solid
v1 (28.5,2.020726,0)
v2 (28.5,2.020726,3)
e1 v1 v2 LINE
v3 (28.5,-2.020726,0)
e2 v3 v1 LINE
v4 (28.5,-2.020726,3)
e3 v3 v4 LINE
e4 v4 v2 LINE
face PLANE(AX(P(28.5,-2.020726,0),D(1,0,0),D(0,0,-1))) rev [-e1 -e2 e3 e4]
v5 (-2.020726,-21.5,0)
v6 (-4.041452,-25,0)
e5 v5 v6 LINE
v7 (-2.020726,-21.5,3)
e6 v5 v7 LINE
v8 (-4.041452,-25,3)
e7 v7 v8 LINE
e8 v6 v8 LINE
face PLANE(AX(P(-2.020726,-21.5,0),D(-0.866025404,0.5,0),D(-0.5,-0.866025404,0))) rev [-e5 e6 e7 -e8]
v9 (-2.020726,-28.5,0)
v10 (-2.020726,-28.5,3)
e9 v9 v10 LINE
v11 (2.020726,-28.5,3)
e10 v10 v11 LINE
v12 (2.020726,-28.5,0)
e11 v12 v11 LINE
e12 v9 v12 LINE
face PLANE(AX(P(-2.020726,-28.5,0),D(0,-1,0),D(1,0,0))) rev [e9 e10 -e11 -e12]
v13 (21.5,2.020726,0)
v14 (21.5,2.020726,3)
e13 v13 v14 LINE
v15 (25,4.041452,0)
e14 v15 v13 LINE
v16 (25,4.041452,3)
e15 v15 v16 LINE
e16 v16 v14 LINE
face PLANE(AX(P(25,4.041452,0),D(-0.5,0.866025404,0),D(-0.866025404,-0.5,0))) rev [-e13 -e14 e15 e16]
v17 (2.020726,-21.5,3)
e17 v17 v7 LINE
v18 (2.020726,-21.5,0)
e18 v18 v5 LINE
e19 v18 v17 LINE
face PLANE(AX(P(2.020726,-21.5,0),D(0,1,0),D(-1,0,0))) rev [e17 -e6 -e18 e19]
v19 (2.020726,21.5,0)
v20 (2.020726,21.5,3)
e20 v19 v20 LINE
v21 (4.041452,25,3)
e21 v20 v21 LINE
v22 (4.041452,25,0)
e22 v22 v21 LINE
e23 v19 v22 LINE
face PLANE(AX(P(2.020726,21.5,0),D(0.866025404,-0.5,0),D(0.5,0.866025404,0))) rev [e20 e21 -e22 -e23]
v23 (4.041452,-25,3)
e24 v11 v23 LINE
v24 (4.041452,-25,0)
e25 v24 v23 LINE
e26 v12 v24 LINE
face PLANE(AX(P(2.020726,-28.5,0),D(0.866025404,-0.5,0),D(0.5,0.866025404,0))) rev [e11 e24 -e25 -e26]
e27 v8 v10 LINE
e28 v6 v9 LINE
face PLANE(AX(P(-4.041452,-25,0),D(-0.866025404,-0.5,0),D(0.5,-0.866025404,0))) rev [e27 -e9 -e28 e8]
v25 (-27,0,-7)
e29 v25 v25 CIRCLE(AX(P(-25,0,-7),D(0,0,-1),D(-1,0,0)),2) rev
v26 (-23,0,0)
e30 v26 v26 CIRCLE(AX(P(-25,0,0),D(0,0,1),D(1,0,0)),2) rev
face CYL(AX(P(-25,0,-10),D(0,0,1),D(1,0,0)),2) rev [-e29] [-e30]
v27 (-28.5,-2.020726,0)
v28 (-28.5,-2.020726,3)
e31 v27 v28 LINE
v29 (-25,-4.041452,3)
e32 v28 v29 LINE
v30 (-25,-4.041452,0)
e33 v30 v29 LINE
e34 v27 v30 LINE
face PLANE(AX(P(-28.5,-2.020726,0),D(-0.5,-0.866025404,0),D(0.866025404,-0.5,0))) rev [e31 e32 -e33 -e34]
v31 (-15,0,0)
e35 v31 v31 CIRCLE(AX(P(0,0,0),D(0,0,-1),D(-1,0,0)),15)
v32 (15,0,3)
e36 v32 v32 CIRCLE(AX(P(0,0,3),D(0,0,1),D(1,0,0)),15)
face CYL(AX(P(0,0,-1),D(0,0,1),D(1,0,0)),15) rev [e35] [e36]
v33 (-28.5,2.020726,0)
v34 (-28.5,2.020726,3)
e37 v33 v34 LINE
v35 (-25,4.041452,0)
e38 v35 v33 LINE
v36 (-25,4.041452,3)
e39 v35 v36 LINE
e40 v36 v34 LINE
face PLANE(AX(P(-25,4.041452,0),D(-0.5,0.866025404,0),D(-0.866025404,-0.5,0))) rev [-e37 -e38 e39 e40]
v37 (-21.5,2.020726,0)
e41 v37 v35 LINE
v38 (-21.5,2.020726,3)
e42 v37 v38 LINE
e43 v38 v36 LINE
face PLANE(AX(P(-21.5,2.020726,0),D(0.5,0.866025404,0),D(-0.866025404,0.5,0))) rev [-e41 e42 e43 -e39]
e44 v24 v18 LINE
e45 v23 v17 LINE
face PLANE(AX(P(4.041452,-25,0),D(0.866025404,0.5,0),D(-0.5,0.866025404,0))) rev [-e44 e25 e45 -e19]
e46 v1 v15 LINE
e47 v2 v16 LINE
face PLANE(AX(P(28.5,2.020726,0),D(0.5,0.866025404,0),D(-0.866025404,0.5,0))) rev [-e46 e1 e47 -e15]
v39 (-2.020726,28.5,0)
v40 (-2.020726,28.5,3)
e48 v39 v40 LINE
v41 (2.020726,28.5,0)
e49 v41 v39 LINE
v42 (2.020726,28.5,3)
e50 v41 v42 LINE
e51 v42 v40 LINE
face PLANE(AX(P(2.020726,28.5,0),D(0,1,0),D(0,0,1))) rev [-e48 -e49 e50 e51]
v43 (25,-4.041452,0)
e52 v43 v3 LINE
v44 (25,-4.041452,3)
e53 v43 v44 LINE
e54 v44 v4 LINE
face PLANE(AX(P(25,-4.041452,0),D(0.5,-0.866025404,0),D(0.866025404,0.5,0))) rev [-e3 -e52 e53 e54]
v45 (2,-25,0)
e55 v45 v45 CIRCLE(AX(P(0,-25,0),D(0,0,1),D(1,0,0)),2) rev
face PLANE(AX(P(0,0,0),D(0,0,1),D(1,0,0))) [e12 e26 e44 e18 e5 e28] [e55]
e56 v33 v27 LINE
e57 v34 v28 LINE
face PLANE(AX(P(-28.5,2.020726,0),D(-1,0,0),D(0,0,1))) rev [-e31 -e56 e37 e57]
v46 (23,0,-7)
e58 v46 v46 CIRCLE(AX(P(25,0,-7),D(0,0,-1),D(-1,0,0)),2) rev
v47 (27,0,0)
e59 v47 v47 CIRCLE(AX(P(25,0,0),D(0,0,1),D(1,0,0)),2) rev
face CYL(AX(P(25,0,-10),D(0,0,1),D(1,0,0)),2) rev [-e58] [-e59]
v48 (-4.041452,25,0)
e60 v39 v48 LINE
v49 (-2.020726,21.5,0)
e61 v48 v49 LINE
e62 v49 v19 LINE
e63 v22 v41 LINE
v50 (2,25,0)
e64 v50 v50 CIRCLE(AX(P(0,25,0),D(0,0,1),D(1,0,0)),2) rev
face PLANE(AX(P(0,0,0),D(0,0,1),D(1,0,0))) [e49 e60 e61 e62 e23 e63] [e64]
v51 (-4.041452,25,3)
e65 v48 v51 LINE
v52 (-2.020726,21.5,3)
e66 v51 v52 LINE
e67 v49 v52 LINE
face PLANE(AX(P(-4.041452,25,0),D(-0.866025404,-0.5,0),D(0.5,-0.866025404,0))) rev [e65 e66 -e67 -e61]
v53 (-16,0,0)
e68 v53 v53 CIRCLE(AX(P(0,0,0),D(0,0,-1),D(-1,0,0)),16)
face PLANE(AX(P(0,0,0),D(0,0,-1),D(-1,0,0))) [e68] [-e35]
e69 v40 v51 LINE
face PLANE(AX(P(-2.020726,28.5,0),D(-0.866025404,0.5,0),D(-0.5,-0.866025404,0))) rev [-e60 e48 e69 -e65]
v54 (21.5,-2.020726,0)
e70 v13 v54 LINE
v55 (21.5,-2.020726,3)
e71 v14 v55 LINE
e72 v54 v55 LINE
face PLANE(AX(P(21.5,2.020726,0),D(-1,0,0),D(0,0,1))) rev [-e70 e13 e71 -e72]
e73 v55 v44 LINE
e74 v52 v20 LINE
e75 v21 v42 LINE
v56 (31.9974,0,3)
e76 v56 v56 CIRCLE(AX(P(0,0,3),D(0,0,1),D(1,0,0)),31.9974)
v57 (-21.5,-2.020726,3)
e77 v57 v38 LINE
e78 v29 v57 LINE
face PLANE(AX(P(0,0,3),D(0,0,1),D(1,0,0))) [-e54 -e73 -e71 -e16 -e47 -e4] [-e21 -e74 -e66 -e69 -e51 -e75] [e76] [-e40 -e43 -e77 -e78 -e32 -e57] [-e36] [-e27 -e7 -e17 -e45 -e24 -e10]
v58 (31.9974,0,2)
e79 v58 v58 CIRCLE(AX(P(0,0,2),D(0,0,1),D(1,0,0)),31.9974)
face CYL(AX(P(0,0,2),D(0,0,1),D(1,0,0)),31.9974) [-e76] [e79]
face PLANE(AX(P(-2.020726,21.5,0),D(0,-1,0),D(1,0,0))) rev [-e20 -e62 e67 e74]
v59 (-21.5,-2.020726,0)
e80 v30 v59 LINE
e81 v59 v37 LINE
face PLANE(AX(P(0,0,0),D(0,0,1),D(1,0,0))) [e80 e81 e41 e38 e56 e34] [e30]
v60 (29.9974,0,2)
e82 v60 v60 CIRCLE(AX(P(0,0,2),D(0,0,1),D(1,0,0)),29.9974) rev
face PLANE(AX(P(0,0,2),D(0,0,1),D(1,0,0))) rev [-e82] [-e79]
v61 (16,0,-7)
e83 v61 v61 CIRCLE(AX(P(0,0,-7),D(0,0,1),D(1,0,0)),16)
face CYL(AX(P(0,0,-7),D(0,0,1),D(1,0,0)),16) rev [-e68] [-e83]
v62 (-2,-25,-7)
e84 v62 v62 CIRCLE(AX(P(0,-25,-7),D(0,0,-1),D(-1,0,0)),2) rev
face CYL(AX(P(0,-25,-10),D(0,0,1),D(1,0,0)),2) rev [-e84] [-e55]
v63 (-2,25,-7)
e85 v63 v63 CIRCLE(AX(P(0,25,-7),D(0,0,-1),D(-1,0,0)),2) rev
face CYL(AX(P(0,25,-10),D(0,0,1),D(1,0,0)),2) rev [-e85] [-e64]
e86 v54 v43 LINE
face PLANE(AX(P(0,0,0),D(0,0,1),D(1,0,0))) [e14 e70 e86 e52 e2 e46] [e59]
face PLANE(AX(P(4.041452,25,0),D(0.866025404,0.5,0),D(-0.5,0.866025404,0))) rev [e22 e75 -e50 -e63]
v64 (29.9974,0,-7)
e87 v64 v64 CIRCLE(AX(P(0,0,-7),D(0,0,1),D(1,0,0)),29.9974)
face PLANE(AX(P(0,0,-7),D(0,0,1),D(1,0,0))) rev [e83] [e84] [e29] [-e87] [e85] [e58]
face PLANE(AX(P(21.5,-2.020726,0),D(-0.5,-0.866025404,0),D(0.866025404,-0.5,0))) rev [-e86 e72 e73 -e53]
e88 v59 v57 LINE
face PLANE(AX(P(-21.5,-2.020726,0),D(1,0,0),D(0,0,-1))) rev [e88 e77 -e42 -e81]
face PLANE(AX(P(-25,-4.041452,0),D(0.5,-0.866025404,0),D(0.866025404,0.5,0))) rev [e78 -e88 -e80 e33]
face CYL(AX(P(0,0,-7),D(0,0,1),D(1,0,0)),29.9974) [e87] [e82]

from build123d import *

# Parameters (mm, degrees)
SKETCH1_R           = 29.9974
SKETCH1_R_2         = 16
BOSS_EXTRUDE1_DEPTH = 7
SKETCH2_R           = 2
CUT_EXTRUDE1_DEPTH  = 10
SKETCH3_R           = 16
SKETCH3_R_2         = 15
BOSS_EXTRUDE2_DEPTH = 1
BOSS_EXTRUDE3_START = 3
SKETCH1_3_R         = 29.9974
SKETCH1_3_R_2       = 16
BOSS_EXTRUDE3_DEPTH = 3
BOSS_EXTRUDE4_START = 2
SKETCH3_2_R         = 16
SKETCH3_2_R_2       = 15
BOSS_EXTRUDE4_DEPTH = 2
SKETCH4_R           = 31.9974
SKETCH4_R_2         = 29.9974
BOSS_EXTRUDE5_DEPTH = 1
CUT_EXTRUDE3_START  = -1
SKETCH5_R           = 16
SKETCH5_R_2         = 15
CUT_EXTRUDE3_DEPTH  = 1
SKETCH6_R           = 3
SKETCH6_R_2         = 2
BOSS_EXTRUDE6_DEPTH = 3
CHAMFER1_SIZE       = 3
CUT_EXTRUDE4_START  = -10
SKETCH7_R           = 2
CUT_EXTRUDE4_DEPTH  = 10
BOSS_EXTRUDE7_START = 1
SKETCH8_R           = 16
SKETCH8_R_2         = 15
BOSS_EXTRUDE7_DEPTH = 1
CUT_EXTRUDE6_DEPTH  = 3


# Read off the part's stored shape, not the designer's step: Cut-Extrude5
with BuildPart() as part:
    # Sketch1 → Boss-Extrude1 (new body)
    with BuildSketch(Plane.XY):
        Circle(SKETCH1_R)
        Circle(SKETCH1_R_2, mode=Mode.SUBTRACT)
    extrude(amount=-BOSS_EXTRUDE1_DEPTH)

    # Sketch2 → Cut-Extrude1 (cut)
    with BuildSketch(Plane.XY):
        with Locations((25, 0)):
            Circle(SKETCH2_R)
        with Locations((0, -25)):
            Circle(SKETCH2_R)
        with Locations((-25, 0)):
            Circle(SKETCH2_R)
        with Locations((0, 25)):
            Circle(SKETCH2_R)
    extrude(amount=-CUT_EXTRUDE1_DEPTH, mode=Mode.SUBTRACT)

    # Sketch3 → Boss-Extrude2 (add)
    with BuildSketch(Plane.XY):
        Circle(SKETCH3_R)
        Circle(SKETCH3_R_2, mode=Mode.SUBTRACT)
    extrude(amount=-BOSS_EXTRUDE2_DEPTH)

    # Sketch1<3> → Boss-Extrude3 (add)
    with BuildSketch(Plane.XY.offset(BOSS_EXTRUDE3_START)):
        Circle(SKETCH1_3_R)
        Circle(SKETCH1_3_R_2, mode=Mode.SUBTRACT)
    extrude(amount=-BOSS_EXTRUDE3_DEPTH)

    # Sketch3<2> → Boss-Extrude4 (add)
    with BuildSketch(Plane.XY.offset(BOSS_EXTRUDE4_START)):
        Circle(SKETCH3_2_R)
        Circle(SKETCH3_2_R_2, mode=Mode.SUBTRACT)
    extrude(amount=-BOSS_EXTRUDE4_DEPTH)

    # Sketch4 → Boss-Extrude5 (add)
    with BuildSketch(Plane.XY.offset(3)):
        Circle(SKETCH4_R)
        Circle(SKETCH4_R_2, mode=Mode.SUBTRACT)
    extrude(amount=-BOSS_EXTRUDE5_DEPTH)

    # Sketch5 → Cut-Extrude3 (cut)
    with BuildSketch(Plane(origin=(0, 0, -1), x_dir=(-1, 0, 0), z_dir=(0, 0, -1)).offset(CUT_EXTRUDE3_START)):
        with Locations(Location((0, 0, 0), (0, 0, 180))):
            Circle(SKETCH5_R)
        with Locations(Location((0, 0, 0), (0, 0, 180))):
            Circle(SKETCH5_R_2, mode=Mode.SUBTRACT)
    extrude(amount=CUT_EXTRUDE3_DEPTH, mode=Mode.SUBTRACT)

    # Sketch6 → Boss-Extrude6 (add)
    # profile 1 of 4: a face of its own
    with BuildSketch(Plane(origin=(0, 0, -7), x_dir=(-1, 0, 0), z_dir=(0, 0, -1))):
        with Locations(Location((-25, 0, 0), (0, 0, 180))):
            Circle(SKETCH6_R)
        with Locations(Location((-25, 0, 0), (0, 0, 180))):
            Circle(SKETCH6_R_2, mode=Mode.SUBTRACT)
    # profile 2 of 4: a face of its own
    with BuildSketch(Plane(origin=(0, 0, -7), x_dir=(-1, 0, 0), z_dir=(0, 0, -1))):
        with Locations(Location((0, -25, 0), (0, 0, 180))):
            Circle(SKETCH6_R)
        with Locations(Location((0, -25, 0), (0, 0, 180))):
            Circle(SKETCH6_R_2, mode=Mode.SUBTRACT)
    # profile 3 of 4: a face of its own
    with BuildSketch(Plane(origin=(0, 0, -7), x_dir=(-1, 0, 0), z_dir=(0, 0, -1))):
        with Locations(Location((25, 0, 0), (0, 0, 180))):
            Circle(SKETCH6_R)
        with Locations(Location((25, 0, 0), (0, 0, 180))):
            Circle(SKETCH6_R_2, mode=Mode.SUBTRACT)
    # profile 4 of 4: a face of its own
    with BuildSketch(Plane(origin=(0, 0, -7), x_dir=(-1, 0, 0), z_dir=(0, 0, -1))):
        with Locations(Location((0, 25, 0), (0, 0, 180))):
            Circle(SKETCH6_R)
        with Locations(Location((0, 25, 0), (0, 0, 180))):
            Circle(SKETCH6_R_2, mode=Mode.SUBTRACT)
    extrude(amount=BOSS_EXTRUDE6_DEPTH)

    # Chamfer1
    # the kernel refuses this chamfer: 3 mm, written as the material it adds along each edge
    with BuildSketch(Plane(origin=(25, 0, -7), x_dir=(1, 0, 0), z_dir=(0, 1, 0))) as chamfer1_piece_1_section:
        Polygon((3 + CHAMFER1_SIZE, 0), (3, CHAMFER1_SIZE), (3, 0), align=None)
    chamfer1_piece_1 = revolve(axis=Axis((25, 0, -7), (0, 0, -1)), mode=Mode.PRIVATE)
    chamfer1_piece_1 = chamfer1_piece_1 & Plane(origin=(0, 0, -8.42256149), x_dir=(1, 0, 0), z_dir=(0, 0, 1)) * Cylinder(29.9974, 25, mode=Mode.PRIVATE)
    chamfer1_piece_1 = split(chamfer1_piece_1, bisect_by=Plane(origin=(20.492585696, 0, -10), z_dir=(0, 0, 1)), keep=Keep.TOP, mode=Mode.PRIVATE)
    add(chamfer1_piece_1)
    with BuildSketch(Plane(origin=(0, -25, -7), x_dir=(1, 0, 0), z_dir=(0, 1, 0))) as chamfer1_piece_2_section:
        Polygon((3 + CHAMFER1_SIZE, 0), (3, CHAMFER1_SIZE), (3, 0), align=None)
    chamfer1_piece_2 = revolve(axis=Axis((0, -25, -7), (0, 0, -1)), mode=Mode.PRIVATE)
    chamfer1_piece_2 = chamfer1_piece_2 & Plane(origin=(0, 0, -8.422561428), x_dir=(1, 0, 0), z_dir=(0, 0, 1)) * Cylinder(29.9974, 25, mode=Mode.PRIVATE)
    chamfer1_piece_2 = split(chamfer1_piece_2, bisect_by=Plane(origin=(-4.507414242, -25, -10), z_dir=(0, 0, 1)), keep=Keep.TOP, mode=Mode.PRIVATE)
    add(chamfer1_piece_2)
    with BuildSketch(Plane(origin=(-25, 0, -7), x_dir=(1, 0, 0), z_dir=(0, 1, 0))) as chamfer1_piece_3_section:
        Polygon((3 + CHAMFER1_SIZE, 0), (3, CHAMFER1_SIZE), (3, 0), align=None)
    chamfer1_piece_3 = revolve(axis=Axis((-25, 0, -7), (0, 0, -1)), mode=Mode.PRIVATE)
    chamfer1_piece_3 = chamfer1_piece_3 & Plane(origin=(0, 0, -8.422561427), x_dir=(1, 0, 0), z_dir=(0, 0, 1)) * Cylinder(29.9974, 25, mode=Mode.PRIVATE)
    chamfer1_piece_3 = split(chamfer1_piece_3, bisect_by=Plane(origin=(-29.507414241, 0, -10), z_dir=(0, 0, 1)), keep=Keep.TOP, mode=Mode.PRIVATE)
    add(chamfer1_piece_3)
    with BuildSketch(Plane(origin=(0, 25, -7), x_dir=(1, 0, 0), z_dir=(0, 1, 0))) as chamfer1_piece_4_section:
        Polygon((3 + CHAMFER1_SIZE, 0), (3, CHAMFER1_SIZE), (3, 0), align=None)
    chamfer1_piece_4 = revolve(axis=Axis((0, 25, -7), (0, 0, -1)), mode=Mode.PRIVATE)
    chamfer1_piece_4 = chamfer1_piece_4 & Plane(origin=(0, 0, -8.422561436), x_dir=(1, 0, 0), z_dir=(0, 0, 1)) * Cylinder(29.9974, 25, mode=Mode.PRIVATE)
    chamfer1_piece_4 = split(chamfer1_piece_4, bisect_by=Plane(origin=(-4.50741425, 25, -10), z_dir=(0, 0, 1)), keep=Keep.TOP, mode=Mode.PRIVATE)
    add(chamfer1_piece_4)

    # Sketch7 → Cut-Extrude4 (cut)
    with BuildSketch(Plane(origin=(0, 0, 0), x_dir=(-1, 0, 0), z_dir=(0, 0, -1)).offset(CUT_EXTRUDE4_START)):
        with Locations(Location((-25, 0, 0), (0, 0, 180))):
            Circle(SKETCH7_R)
        with Locations(Location((0, 25, 0), (0, 0, 180))):
            Circle(SKETCH7_R)
        with Locations(Location((25, 0, 0), (0, 0, 180))):
            Circle(SKETCH7_R)
        with Locations(Location((0, -25, 0), (0, 0, 180))):
            Circle(SKETCH7_R)
    extrude(amount=CUT_EXTRUDE4_DEPTH, mode=Mode.SUBTRACT)

    # Sketch8 → Boss-Extrude7 (add)
    with BuildSketch(Plane.XY.offset(2).offset(BOSS_EXTRUDE7_START)):
        Circle(SKETCH8_R)
        Circle(SKETCH8_R_2, mode=Mode.SUBTRACT)
    extrude(amount=-BOSS_EXTRUDE7_DEPTH)

    # Cut-Extrude5 outline → Cut-Extrude5 (revolve, cut)
    with BuildSketch(Plane(origin=(25, 0, 0), x_dir=(1, 0, 0), z_dir=(0, -1, 0))):
        Polygon((2, -7), (2, -10), (3, -10), (6, -7), align=None)
    revolve(axis=Axis((25, 0, 0), (0, 0, 1)), mode=Mode.SUBTRACT)

    # Cut-Extrude5 2 outline → Cut-Extrude5 2 (revolve, cut)
    with BuildSketch(Plane.XZ.offset(25)):
        Polygon((2, -7), (2, -10), (3, -10), (6, -7), align=None)
    revolve(axis=Axis((0, -25, 0), (0, 0, 1)), mode=Mode.SUBTRACT)

    # Cut-Extrude5 3 outline → Cut-Extrude5 3 (revolve, cut)
    with BuildSketch(Plane(origin=(-25, 0, 0), x_dir=(1, 0, 0), z_dir=(0, -1, 0))):
        Polygon((2, -7), (2, -10), (3, -10), (6, -7), align=None)
    revolve(axis=Axis((-25, 0, 0), (0, 0, 1)), mode=Mode.SUBTRACT)

    # Cut-Extrude5 4 outline → Cut-Extrude5 4 (revolve, cut)
    with BuildSketch(Plane.XZ.offset(-25)):
        Polygon((2, -7), (2, -10), (3, -10), (6, -7), align=None)
    revolve(axis=Axis((0, 25, 0), (0, 0, 1)), mode=Mode.SUBTRACT)

    # Sketch10 → Cut-Extrude6 (cut)
    with BuildSketch(Plane.XY.offset(3)):
        Polygon((-4.041451884, -25), (-2.020725942, -28.5), (2.020725942, -28.5), (4.041451884, -25), (2.020725942, -21.5), (-2.020725942, -21.5), align=None)
        Polygon((25, -4.041451884), (28.5, -2.020725942), (28.5, 2.020725942), (25, 4.041451884), (21.5, 2.020725942), (21.5, -2.020725942), align=None)
        Polygon((-25, 4.041451884), (-28.5, 2.020725942), (-28.5, -2.020725942), (-25, -4.041451884), (-21.5, -2.020725942), (-21.5, 2.020725942), align=None)
        Polygon((4.041451884, 25), (2.020725942, 28.5), (-2.020725942, 28.5), (-4.041451884, 25), (-2.020725942, 21.5), (2.020725942, 21.5), align=None)
    extrude(amount=-CUT_EXTRUDE6_DEPTH, mode=Mode.SUBTRACT)


solid = part.part
